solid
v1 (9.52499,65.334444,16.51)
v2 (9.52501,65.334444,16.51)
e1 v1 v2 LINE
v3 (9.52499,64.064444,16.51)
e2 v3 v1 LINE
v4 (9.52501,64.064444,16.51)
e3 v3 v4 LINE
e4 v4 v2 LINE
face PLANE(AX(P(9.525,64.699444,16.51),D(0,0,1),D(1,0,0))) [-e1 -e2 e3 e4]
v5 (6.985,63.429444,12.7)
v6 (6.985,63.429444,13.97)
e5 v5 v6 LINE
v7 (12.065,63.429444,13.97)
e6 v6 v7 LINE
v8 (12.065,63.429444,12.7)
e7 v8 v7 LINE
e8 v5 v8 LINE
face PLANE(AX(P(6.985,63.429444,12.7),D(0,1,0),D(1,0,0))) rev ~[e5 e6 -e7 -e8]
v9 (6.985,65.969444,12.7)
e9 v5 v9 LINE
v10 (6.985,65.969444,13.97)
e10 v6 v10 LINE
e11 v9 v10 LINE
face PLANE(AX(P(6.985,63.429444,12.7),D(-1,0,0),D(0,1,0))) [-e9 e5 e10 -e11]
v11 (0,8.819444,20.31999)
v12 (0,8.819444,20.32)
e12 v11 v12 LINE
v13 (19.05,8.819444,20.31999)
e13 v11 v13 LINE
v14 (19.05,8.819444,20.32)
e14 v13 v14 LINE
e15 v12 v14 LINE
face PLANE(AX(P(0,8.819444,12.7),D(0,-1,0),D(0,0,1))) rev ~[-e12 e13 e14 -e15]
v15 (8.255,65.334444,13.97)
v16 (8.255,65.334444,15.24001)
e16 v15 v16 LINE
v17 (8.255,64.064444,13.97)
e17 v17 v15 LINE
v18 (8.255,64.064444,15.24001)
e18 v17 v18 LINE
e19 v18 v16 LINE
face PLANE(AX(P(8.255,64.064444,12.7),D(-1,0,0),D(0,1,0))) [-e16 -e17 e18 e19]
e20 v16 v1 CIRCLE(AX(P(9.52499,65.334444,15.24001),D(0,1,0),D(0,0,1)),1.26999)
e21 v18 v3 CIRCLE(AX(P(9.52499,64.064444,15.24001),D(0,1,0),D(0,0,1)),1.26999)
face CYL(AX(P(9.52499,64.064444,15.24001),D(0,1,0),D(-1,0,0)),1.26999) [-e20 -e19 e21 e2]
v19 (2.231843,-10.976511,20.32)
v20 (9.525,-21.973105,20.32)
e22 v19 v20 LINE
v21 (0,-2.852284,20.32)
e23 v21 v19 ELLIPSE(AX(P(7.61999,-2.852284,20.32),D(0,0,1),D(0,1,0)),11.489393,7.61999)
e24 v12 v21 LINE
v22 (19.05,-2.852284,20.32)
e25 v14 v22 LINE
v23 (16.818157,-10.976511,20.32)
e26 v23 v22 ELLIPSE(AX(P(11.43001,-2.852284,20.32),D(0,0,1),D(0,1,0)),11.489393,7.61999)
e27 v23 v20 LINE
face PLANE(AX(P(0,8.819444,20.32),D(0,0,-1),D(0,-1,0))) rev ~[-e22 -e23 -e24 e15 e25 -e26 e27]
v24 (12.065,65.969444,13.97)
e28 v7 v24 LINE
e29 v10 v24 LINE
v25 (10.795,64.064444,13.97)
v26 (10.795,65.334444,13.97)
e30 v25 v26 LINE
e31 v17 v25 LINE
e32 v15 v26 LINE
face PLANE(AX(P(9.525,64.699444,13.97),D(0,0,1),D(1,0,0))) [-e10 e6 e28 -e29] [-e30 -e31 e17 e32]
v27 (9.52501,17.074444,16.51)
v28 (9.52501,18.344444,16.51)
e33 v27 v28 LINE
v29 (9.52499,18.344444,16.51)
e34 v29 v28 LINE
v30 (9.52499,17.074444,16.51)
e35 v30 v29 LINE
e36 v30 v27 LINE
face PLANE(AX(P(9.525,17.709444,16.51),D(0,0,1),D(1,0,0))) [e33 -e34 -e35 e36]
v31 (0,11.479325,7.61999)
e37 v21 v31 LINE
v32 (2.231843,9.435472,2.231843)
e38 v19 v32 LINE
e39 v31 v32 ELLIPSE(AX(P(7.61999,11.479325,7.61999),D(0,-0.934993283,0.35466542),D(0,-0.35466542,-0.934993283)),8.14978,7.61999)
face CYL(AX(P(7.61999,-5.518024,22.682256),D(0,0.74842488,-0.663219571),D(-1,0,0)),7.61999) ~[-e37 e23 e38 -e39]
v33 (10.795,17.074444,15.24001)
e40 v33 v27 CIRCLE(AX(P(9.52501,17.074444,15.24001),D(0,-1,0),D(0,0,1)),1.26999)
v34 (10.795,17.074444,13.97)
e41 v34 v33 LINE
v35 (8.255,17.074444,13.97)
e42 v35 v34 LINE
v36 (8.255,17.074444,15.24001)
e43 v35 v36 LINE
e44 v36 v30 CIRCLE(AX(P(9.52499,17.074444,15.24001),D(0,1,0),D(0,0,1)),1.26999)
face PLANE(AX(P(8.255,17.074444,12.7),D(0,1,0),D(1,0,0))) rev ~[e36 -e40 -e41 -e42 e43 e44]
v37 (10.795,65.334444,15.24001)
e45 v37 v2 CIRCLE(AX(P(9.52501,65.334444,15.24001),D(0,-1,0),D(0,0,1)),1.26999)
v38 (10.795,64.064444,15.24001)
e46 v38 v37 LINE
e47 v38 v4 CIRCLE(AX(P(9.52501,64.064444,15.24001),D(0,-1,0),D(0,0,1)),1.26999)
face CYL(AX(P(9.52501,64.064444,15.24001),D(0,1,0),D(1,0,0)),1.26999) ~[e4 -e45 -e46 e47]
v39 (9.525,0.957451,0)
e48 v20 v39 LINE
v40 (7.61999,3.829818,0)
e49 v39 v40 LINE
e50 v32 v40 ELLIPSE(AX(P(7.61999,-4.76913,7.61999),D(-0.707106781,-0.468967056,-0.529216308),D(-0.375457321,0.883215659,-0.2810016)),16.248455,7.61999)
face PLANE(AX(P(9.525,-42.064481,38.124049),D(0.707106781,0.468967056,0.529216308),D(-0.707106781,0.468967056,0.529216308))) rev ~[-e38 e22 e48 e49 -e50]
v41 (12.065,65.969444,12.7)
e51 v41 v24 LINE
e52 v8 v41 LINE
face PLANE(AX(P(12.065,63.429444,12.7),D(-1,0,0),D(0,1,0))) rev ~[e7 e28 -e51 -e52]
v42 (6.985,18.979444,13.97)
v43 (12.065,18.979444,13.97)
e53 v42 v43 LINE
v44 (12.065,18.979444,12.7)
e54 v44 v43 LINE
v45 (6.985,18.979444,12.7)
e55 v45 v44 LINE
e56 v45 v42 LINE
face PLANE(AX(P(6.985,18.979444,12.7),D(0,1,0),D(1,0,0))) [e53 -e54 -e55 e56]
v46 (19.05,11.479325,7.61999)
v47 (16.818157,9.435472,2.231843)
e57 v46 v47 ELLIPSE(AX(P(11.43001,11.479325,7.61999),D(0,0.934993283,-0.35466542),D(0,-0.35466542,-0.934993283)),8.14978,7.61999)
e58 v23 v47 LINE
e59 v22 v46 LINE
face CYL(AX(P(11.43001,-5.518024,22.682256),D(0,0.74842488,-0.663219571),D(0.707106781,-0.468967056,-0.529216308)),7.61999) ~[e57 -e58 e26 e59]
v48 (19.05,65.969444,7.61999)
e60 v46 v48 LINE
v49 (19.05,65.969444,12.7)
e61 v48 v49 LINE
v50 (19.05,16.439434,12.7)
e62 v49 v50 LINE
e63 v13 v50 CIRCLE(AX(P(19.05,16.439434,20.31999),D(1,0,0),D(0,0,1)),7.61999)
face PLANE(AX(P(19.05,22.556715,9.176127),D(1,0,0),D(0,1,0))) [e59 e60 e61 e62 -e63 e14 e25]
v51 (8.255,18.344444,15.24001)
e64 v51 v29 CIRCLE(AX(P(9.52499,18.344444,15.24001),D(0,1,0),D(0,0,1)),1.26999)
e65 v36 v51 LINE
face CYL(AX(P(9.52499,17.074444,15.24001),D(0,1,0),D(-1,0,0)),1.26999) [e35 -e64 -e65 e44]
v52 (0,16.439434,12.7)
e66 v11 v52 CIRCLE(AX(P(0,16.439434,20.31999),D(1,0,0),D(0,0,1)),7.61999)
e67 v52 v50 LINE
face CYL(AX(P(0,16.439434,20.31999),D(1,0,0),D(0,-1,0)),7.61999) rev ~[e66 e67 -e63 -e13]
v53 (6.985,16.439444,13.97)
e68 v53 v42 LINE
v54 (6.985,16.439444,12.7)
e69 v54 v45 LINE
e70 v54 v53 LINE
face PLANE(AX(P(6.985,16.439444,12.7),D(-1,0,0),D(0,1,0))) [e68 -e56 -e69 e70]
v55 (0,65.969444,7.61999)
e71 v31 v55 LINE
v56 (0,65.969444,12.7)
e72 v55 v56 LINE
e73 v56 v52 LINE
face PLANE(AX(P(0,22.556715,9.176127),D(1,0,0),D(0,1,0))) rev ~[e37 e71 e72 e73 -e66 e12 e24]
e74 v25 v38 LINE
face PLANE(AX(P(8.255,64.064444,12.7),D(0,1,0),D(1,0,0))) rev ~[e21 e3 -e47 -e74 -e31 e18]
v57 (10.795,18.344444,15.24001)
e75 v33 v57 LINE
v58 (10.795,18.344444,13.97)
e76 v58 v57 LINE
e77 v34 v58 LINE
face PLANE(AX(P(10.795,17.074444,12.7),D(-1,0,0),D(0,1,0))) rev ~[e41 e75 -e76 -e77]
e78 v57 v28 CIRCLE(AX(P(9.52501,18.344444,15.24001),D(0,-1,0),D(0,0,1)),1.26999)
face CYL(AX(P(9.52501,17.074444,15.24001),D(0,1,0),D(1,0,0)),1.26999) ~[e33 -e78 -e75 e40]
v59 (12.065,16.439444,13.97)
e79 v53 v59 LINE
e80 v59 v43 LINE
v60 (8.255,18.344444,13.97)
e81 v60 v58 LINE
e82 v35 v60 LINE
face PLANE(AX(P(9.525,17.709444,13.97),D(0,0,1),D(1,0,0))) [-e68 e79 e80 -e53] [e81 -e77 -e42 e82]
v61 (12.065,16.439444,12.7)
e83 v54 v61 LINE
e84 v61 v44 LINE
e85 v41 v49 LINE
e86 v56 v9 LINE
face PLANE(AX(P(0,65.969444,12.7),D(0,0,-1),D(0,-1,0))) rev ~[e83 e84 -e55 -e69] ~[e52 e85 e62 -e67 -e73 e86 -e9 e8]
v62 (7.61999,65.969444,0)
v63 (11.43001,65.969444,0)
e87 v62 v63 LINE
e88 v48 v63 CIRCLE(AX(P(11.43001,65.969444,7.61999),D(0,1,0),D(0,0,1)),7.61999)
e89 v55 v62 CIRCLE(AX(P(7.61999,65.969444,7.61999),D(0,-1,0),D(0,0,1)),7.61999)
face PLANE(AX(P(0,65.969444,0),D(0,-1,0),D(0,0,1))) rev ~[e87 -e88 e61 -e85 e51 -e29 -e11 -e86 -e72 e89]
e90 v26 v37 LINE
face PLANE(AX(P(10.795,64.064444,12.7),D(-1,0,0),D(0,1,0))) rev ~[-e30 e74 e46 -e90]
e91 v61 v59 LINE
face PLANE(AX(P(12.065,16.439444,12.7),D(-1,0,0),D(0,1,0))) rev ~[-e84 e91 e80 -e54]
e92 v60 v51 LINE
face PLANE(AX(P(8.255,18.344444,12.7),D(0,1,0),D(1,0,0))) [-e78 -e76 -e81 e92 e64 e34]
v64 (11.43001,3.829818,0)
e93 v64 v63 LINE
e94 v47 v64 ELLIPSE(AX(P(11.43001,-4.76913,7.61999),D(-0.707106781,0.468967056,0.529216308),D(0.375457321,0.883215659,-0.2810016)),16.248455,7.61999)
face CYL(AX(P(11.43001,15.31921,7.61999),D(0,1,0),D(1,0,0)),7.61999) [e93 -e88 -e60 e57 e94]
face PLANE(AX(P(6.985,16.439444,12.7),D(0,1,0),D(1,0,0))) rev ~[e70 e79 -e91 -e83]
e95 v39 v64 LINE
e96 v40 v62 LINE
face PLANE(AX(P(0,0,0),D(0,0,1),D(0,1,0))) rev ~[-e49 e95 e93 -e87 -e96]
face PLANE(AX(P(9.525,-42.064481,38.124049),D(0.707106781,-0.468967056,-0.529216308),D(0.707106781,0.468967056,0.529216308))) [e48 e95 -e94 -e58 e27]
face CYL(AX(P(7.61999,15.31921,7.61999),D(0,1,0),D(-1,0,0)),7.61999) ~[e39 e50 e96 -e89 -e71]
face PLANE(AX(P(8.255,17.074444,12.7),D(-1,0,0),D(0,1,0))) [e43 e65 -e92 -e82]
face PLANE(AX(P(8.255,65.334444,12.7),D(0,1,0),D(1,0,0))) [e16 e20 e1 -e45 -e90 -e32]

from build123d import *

# Parameters (mm, degrees)
F1_DEPTH    = 19.05
F2_T1_DEPTH = 82.895018686
F3_R        = 7.61999
F5_W        = 2.54
F5_H        = 1.27
F6_DEPTH    = 3.81
F4_W        = 5.08
F4_H        = 2.54
F7_DEPTH    = 1.27
F8_R        = 1.26999


# Not quite as in the source:
# - a fillet or chamfer that OpenCascade refuses, or shapes differently, is made with other operations: its cross-section is extruded or revolved along the edge and cut away or added
# - a fillet or chamfer is up to 0.001 mm smaller than in the source, because OpenCascade refuses the exact size


with BuildPart() as f1:
    # F0 (on Right) → F1 (new body)
    with BuildSketch(Plane.YZ):
        Polygon((-22.9305560945, 20.32), (0, 0), (65.9694439055, 0), (65.9694439055, 12.7), (8.8194439055, 12.7), (8.8194439055, 20.32), align=None)
    extrude(amount=F1_DEPTH)

    # F2: chamfer of 10.16 on 2 edges, made by hand

    # F2_s2 → F2_t1 (cut)
    with BuildSketch(Plane(origin=(0, -42.4856252608, 37.6487993462), x_dir=(1, 0, 0), z_dir=(0, 0.7484248802, -0.6632195705))):
        Polygon((8.89, 0), (19.05, -10.16), (19.05, 0), align=None)
        Polygon((10.16, 0), (0, -10.16), (0, 0), align=None)
    extrude(amount=F2_T1_DEPTH, mode=Mode.SUBTRACT)

    # F3 (radius 7.62 in the source; OpenCascade refuses exactly that, so slightly less here)
    f3_edges = [f1.edges().sort_by_distance(p)[0] for p in [
        (0, 3.853932, 10.16),
        (0, 40.644327, 0),
        (19.05, 40.644327, 0),
        (19.05, 3.853932, 10.16),
        (9.525, 8.819444, 12.7),
    ]]
    fillet(f3_edges, radius=F3_R)

    # F5 (on face) → F6 (join)
    with BuildSketch(Plane.XY.offset(12.7)):
        with Locations((9.525, 17.7094439055)):
            Rectangle(F5_W, F5_H)
        with Locations((9.525, 64.6994439055)):
            Rectangle(F5_W, F5_H)
    extrude(amount=F6_DEPTH)

    # F4 (on face) → F7 (join)
    with BuildSketch(Plane.XY.offset(12.7)):
        with Locations((9.525, 17.7094439055)):
            Rectangle(F4_W, F4_H)
        with Locations((9.525, 64.6994439055)):
            Rectangle(F4_W, F4_H)
    extrude(amount=F7_DEPTH)

    # F8 (radius 1.27 in the source; OpenCascade refuses exactly that, so slightly less here)
    f8_edges = [f1.edges().sort_by_distance(p)[0] for p in [
        (10.795, 17.709444, 16.51),
        (8.255, 17.709444, 16.51),
        (8.255, 64.699444, 16.51),
        (10.795, 64.699444, 16.51),
    ]]
    fillet(f8_edges, radius=F8_R)


solid = f1.part
